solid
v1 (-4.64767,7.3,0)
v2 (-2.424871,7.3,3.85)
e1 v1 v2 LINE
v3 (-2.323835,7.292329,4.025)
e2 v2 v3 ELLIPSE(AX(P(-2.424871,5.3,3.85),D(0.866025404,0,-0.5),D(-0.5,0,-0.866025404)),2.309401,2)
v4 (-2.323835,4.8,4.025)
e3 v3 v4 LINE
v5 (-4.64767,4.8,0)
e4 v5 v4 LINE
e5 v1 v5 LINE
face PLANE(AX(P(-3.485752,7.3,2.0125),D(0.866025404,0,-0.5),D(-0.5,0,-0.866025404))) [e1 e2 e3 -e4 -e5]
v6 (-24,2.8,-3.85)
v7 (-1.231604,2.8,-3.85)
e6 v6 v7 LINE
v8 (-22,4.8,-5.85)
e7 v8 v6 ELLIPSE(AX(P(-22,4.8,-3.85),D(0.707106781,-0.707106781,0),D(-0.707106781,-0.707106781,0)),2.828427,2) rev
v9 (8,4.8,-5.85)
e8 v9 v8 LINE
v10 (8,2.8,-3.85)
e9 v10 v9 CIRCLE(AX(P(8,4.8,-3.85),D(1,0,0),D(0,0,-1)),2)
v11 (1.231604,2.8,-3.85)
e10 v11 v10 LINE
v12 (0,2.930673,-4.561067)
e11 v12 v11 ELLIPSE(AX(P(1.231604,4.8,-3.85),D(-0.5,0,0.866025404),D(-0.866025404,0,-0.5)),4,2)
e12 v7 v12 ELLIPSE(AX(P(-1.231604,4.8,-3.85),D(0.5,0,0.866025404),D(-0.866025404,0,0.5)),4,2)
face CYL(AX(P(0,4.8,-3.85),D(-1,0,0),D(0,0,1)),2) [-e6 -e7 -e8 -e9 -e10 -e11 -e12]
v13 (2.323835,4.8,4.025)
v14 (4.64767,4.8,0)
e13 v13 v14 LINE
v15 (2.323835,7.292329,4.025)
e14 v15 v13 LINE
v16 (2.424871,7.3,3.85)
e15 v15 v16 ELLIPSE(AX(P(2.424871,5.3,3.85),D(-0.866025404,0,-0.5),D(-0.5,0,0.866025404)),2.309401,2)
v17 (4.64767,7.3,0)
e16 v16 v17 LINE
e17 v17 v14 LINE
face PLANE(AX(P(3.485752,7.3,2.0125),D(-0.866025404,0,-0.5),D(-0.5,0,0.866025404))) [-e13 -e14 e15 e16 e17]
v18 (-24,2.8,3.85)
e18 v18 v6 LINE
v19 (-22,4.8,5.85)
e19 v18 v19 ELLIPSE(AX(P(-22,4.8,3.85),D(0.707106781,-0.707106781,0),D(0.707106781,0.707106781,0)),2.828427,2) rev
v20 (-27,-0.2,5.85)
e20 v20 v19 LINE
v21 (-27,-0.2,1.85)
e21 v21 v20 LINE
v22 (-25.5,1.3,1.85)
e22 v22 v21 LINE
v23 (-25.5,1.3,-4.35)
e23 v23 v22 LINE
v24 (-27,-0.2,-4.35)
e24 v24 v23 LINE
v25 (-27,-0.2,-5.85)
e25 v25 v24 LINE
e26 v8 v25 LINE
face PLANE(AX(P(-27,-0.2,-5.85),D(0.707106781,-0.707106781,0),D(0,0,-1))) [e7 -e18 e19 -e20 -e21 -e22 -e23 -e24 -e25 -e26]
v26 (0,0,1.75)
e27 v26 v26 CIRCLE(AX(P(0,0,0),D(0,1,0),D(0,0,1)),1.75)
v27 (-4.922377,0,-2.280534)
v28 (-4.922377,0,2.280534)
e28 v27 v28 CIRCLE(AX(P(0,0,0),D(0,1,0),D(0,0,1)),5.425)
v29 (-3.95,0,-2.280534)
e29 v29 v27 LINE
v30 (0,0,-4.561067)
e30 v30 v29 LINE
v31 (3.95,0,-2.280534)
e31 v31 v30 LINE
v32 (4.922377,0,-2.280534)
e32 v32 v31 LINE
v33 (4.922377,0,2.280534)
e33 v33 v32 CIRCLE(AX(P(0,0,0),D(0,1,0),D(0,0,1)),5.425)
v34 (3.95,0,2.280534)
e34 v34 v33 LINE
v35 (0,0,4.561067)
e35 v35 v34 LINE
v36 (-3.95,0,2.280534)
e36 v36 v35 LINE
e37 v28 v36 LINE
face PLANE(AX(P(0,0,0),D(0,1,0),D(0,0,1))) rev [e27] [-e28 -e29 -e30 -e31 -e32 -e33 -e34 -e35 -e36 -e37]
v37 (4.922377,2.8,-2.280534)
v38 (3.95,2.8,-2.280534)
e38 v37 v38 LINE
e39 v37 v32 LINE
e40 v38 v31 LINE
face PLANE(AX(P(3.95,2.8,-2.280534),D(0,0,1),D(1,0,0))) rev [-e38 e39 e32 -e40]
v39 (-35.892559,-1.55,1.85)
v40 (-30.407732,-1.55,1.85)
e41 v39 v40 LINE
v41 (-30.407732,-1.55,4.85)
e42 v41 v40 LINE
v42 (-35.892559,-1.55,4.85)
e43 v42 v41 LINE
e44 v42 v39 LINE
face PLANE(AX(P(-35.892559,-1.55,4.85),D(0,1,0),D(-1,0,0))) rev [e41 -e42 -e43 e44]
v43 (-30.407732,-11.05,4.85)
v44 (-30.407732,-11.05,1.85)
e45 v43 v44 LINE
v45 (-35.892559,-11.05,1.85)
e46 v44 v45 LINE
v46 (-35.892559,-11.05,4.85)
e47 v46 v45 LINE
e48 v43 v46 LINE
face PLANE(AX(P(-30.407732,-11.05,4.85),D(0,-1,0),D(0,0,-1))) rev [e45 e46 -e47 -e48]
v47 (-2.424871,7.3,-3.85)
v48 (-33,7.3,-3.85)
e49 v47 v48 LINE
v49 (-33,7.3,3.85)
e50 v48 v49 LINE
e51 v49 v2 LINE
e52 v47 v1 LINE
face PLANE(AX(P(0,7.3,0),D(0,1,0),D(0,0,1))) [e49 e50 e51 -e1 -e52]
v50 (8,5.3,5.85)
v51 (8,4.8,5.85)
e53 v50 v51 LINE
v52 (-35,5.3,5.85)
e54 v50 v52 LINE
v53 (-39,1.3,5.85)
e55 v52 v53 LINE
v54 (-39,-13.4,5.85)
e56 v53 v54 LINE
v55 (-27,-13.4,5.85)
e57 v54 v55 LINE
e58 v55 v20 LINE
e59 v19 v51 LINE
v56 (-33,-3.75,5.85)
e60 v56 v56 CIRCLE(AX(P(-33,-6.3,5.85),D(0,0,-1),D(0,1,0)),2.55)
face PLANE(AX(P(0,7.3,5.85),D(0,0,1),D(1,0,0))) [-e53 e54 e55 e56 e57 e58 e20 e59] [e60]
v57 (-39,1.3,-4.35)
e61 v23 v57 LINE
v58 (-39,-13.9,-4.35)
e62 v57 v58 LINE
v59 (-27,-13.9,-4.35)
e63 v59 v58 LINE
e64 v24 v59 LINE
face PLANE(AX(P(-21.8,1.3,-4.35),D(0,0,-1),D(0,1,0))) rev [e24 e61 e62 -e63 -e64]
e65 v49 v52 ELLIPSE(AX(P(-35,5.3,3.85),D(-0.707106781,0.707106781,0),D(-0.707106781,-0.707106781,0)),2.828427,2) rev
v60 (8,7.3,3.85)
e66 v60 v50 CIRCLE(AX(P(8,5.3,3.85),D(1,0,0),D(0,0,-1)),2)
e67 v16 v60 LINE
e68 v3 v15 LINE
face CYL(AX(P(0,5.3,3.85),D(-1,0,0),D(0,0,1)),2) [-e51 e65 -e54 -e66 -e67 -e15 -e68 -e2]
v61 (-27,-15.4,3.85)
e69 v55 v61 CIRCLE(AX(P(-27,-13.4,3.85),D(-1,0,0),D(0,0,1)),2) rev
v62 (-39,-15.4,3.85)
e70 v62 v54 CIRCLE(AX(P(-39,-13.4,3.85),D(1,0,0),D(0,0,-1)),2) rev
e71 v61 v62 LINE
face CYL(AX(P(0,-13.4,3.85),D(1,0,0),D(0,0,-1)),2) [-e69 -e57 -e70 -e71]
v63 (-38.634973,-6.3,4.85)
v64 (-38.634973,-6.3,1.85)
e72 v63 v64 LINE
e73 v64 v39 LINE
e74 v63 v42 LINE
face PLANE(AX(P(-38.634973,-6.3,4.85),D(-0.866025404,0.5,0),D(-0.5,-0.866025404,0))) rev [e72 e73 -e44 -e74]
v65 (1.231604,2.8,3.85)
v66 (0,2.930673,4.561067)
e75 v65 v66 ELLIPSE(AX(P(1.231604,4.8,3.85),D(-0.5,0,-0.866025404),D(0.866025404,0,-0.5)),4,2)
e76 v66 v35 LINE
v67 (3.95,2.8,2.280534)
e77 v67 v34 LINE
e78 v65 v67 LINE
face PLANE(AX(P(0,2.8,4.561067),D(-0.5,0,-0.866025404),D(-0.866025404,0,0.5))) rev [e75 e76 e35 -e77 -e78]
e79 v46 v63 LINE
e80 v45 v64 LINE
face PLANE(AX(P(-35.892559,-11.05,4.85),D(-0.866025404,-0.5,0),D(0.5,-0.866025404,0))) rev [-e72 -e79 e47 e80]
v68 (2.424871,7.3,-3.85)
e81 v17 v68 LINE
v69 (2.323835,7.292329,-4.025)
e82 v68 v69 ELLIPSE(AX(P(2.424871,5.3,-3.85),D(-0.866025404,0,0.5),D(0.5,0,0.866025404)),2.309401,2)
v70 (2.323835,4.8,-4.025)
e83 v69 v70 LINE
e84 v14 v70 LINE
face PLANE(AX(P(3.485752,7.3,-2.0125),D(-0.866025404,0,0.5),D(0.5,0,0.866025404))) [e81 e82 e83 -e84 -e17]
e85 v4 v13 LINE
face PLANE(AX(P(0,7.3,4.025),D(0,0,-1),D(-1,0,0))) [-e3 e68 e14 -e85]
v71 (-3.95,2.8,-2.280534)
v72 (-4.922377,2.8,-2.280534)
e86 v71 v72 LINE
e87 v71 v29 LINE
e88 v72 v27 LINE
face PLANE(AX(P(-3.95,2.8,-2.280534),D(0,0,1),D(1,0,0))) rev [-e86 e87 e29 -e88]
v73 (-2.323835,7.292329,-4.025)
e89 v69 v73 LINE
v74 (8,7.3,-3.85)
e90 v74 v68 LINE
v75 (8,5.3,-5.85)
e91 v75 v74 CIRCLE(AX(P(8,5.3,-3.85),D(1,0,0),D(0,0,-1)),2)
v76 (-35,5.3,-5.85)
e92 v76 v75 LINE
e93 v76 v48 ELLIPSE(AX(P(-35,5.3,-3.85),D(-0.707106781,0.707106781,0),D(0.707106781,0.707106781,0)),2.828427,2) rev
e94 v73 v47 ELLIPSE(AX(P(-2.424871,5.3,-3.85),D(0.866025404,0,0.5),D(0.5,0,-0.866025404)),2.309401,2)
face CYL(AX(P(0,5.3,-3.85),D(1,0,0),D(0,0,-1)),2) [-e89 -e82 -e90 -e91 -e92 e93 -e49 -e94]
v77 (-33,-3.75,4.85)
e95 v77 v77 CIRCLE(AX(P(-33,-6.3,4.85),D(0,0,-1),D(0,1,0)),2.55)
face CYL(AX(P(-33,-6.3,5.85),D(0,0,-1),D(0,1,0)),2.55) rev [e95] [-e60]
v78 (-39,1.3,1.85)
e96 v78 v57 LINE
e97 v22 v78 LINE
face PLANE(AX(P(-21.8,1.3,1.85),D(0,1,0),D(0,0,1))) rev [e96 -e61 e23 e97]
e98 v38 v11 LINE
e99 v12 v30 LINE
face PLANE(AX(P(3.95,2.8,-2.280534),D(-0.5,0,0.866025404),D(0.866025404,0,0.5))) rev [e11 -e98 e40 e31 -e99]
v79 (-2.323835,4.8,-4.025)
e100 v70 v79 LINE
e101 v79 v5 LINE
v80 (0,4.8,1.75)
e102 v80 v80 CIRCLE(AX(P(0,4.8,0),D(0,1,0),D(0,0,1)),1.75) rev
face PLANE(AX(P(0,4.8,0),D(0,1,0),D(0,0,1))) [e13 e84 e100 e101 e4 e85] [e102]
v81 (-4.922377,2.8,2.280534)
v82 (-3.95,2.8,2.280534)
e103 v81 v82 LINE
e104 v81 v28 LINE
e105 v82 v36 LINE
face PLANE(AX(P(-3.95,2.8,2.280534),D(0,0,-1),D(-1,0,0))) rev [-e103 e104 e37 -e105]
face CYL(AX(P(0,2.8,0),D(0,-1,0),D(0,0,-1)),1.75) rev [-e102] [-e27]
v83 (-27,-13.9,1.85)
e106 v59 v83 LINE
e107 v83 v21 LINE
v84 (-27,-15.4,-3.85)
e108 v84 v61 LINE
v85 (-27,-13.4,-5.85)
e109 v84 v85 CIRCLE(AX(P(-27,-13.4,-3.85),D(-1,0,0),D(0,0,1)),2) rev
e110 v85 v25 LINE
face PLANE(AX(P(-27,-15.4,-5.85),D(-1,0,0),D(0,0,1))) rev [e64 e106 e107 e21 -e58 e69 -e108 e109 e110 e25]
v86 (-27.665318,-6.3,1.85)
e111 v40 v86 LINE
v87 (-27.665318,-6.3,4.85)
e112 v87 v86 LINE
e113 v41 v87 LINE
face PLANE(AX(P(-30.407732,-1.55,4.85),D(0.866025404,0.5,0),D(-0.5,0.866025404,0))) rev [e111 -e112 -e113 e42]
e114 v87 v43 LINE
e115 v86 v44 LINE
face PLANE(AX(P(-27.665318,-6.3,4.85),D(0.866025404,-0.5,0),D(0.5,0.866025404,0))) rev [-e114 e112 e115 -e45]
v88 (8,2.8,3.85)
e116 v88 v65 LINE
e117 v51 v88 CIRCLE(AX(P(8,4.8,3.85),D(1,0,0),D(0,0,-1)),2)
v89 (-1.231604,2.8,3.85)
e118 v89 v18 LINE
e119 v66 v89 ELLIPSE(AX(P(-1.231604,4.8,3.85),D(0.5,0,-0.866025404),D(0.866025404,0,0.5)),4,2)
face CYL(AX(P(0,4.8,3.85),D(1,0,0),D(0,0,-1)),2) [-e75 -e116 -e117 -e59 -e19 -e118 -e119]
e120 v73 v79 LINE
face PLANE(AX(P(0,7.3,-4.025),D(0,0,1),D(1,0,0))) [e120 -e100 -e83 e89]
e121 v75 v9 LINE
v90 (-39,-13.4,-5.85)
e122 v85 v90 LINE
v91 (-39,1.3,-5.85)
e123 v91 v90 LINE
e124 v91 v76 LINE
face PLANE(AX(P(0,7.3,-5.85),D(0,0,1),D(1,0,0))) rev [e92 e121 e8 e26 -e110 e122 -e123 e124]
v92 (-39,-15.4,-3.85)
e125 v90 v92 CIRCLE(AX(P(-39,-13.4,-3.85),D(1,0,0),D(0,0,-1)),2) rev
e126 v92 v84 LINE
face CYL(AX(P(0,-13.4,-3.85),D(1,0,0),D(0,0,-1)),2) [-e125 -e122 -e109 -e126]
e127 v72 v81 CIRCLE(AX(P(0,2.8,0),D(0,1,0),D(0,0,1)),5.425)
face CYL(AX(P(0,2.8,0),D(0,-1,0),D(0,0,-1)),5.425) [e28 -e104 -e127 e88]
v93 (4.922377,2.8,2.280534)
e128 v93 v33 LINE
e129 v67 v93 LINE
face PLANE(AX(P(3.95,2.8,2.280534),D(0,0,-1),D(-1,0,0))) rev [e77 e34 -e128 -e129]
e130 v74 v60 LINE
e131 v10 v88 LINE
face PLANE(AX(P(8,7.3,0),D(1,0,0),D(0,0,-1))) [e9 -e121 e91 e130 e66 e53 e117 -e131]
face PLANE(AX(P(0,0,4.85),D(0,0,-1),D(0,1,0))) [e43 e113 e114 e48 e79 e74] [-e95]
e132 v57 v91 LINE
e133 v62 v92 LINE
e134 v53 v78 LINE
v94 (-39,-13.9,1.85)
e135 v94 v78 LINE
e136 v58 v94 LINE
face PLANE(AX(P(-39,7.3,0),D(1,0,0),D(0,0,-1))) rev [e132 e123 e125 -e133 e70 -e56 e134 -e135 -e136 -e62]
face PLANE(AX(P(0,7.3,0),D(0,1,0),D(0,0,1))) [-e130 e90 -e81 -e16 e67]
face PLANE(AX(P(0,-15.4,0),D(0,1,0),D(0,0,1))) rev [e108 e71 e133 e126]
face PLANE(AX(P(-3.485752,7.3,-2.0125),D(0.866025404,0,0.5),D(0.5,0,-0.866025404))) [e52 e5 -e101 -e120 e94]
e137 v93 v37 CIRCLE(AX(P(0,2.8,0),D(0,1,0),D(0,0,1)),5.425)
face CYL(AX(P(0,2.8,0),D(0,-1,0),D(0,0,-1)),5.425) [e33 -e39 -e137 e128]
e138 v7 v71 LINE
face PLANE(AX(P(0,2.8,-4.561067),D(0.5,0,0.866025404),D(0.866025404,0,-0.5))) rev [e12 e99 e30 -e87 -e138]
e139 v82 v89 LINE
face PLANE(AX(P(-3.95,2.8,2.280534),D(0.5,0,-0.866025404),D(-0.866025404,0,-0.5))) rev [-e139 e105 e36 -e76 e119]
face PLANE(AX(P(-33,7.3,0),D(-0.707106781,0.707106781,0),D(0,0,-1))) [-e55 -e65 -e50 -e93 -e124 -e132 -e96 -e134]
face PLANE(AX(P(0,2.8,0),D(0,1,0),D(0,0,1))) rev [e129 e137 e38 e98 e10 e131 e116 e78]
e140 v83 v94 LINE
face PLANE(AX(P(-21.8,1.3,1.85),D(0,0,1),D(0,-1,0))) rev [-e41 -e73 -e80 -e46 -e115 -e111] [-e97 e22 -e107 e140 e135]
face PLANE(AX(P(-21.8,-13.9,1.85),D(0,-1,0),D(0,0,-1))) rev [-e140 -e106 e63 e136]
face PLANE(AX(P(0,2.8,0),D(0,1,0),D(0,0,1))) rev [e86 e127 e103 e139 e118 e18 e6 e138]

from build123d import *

# Parameters (mm, degrees)
SKETCH1_R           = 1.75
BOSS_EXTRUDE1_DEPTH = 2.8
SKETCH2_W           = 47
SKETCH2_H           = 11.7
BOSS_EXTRUDE2_DEPTH = 4.5
SKETCH2_4_R         = 1.75
BOSS_EXTRUDE3_DEPTH = 2
SKETCH3_W           = 12
SKETCH3_H           = 11.7
BOSS_EXTRUDE4_DEPTH = 18.2
SKETCH4_W           = 6.2
SKETCH4_H           = 15.2
CUT_EXTRUDE2_DEPTH  = 17.2
SKETCH5_R           = 2.55
CUT_EXTRUDE4_DEPTH  = 3
SKETCH5_2_R         = 2.55
CUT_EXTRUDE5_DEPTH  = 43.631561079
FILLET1_R           = 2
CHAMFER1_SIZE       = 3
FILLET2_R           = 2
CHAMFER2_SIZE       = 6


with BuildPart() as part:
    # Sketch1 → Boss-Extrude1 (new body)
    with BuildSketch(Plane(origin=(0, 0, 0), x_dir=(1, 0, 0), z_dir=(0, 1, 0))):
        with BuildLine():
            Line((-3.95, 2.280533563), (-4.922376628, 2.280533563))
            ThreePointArc((-4.922376628, 2.280533563), (-5.425, 0), (-4.922376628, -2.280533563))
            Line((-4.922376628, -2.280533563), (-3.95, -2.280533563))
            Line((-3.95, -2.280533563), (0, -4.561067127))
            Line((0, -4.561067127), (3.95, -2.280533563))
            Line((3.95, -2.280533563), (4.922376628, -2.280533563))
            ThreePointArc((4.922376628, -2.280533563), (5.425, 0), (4.922376628, 2.280533563))
            Line((4.922376628, 2.280533563), (3.95, 2.280533563))
            Line((3.95, 2.280533563), (0, 4.561067127))
            Line((0, 4.561067127), (-3.95, 2.280533563))
        make_face()
        with Locations(Location((0, 0, 0), (0, 0, 270))):
            Circle(SKETCH1_R, mode=Mode.SUBTRACT)
    extrude(amount=BOSS_EXTRUDE1_DEPTH)

    # Sketch2 → Boss-Extrude2 (add)
    with BuildSketch(Plane(origin=(0, 2.8, 0), x_dir=(1, 0, 0), z_dir=(0, 1, 0))):
        with Locations((-15.5, 0)):
            Rectangle(SKETCH2_W, SKETCH2_H)
        Polygon((4.647669667, 0), (2.323834833, 4.025), (-2.323834833, 4.025), (-4.647669667, 0), (-2.323834833, -4.025), (2.323834833, -4.025), align=None, mode=Mode.SUBTRACT)
    extrude(amount=BOSS_EXTRUDE2_DEPTH)

    # Sketch2<4> → Boss-Extrude3 (add)
    # profile 1 of 5: a face of its own
    with BuildSketch(Plane(origin=(0, 2.8, 0), x_dir=(1, 0, 0), z_dir=(0, 1, 0))):
        Polygon((0.9284955, 4.025), (3.0215045, 2.81660069), (2.323834833, 4.025), align=None)
    # profile 2 of 5: a face of its own
    with BuildSketch(Plane(origin=(0, 2.8, 0), x_dir=(1, 0, 0), z_dir=(0, 1, 0))):
        Polygon((3.0215045, -2.81660069), (4.647669667, 0), (3.0215045, 2.81660069), (0.9284955, 4.025), (-0.9284955, 4.025), (-3.0215045, 2.81660069), (-4.647669667, 0), (-3.0215045, -2.81660069), (-0.9284955, -4.025), (0.9284955, -4.025), align=None)
        with Locations(Location((0, 0, 0), (0, 0, 270))):
            Circle(SKETCH2_4_R, mode=Mode.SUBTRACT)
    # profile 3 of 5: a face of its own
    with BuildSketch(Plane(origin=(0, 2.8, 0), x_dir=(1, 0, 0), z_dir=(0, 1, 0))):
        Polygon((2.323834833, -4.025), (3.0215045, -2.81660069), (0.9284955, -4.025), align=None)
    # profile 4 of 5: a face of its own
    with BuildSketch(Plane(origin=(0, 2.8, 0), x_dir=(1, 0, 0), z_dir=(0, 1, 0))):
        Polygon((-2.323834833, -4.025), (-0.9284955, -4.025), (-3.0215045, -2.81660069), align=None)
    # profile 5 of 5: a face of its own
    with BuildSketch(Plane(origin=(0, 2.8, 0), x_dir=(1, 0, 0), z_dir=(0, 1, 0))):
        Polygon((-3.0215045, 2.81660069), (-0.9284955, 4.025), (-2.323834833, 4.025), align=None)
    extrude(amount=BOSS_EXTRUDE3_DEPTH)

    # Sketch3 → Boss-Extrude4 (add)
    with BuildSketch(Plane.XZ.offset(-2.8)):
        with Locations((-33, 0)):
            Rectangle(SKETCH3_W, SKETCH3_H)
    extrude(amount=BOSS_EXTRUDE4_DEPTH)

    # Sketch4 → Cut-Extrude2 (cut)
    with BuildSketch(Plane.ZY.offset(39)):
        with Locations((-1.25, -6.3)):
            Rectangle(SKETCH4_W, SKETCH4_H)
    extrude(amount=-CUT_EXTRUDE2_DEPTH, mode=Mode.SUBTRACT)

    # Sketch5 → Cut-Extrude4 (cut)
    with BuildSketch(Plane(origin=(0, 0, 1.85), x_dir=(-1, 0, 0), z_dir=(0, 0, -1))):
        Polygon((38.634973236, -6.3), (35.892559458, -1.55), (30.4077319, -1.55), (27.665318122, -6.3), (30.4077319, -11.05), (35.892559458, -11.05), align=None)
        with Locations(Location((33, -6.3, 0), (0, 0, 90))):
            Circle(SKETCH5_R, mode=Mode.SUBTRACT)
    extrude(amount=-CUT_EXTRUDE4_DEPTH, mode=Mode.SUBTRACT)

    # Sketch5<2> → Cut-Extrude5 (cut, through all)
    with BuildSketch(Plane(origin=(0, 0, 1.85), x_dir=(-1, 0, 0), z_dir=(0, 0, -1))):
        with Locations(Location((33, -6.3, 0), (0, 0, 90))):
            Circle(SKETCH5_2_R)
    extrude(amount=-CUT_EXTRUDE5_DEPTH, mode=Mode.SUBTRACT)

    # Fillet1
    # the kernel refuses this fillet: 2 mm, written as the material it takes off along each edge
    with BuildSketch(Plane(origin=(-22, -15.4, 5.85), x_dir=(0, 1, 0), z_dir=(-1, 0, 0)), Plane(origin=(-44, -15.4, -5.85), x_dir=(0, 1, 0), z_dir=(1, 0, 0))) as fillet1_piece_1:
        with BuildLine():
            CenterArc((FILLET1_R, FILLET1_R), FILLET1_R, 180, 90)
            Line((0, FILLET1_R), (0, 0))
            Line((0, 0), (FILLET1_R, 0))
        make_face()
    extrude(amount=22, mode=Mode.SUBTRACT)
    with BuildSketch(Plane(origin=(-44, 7.3, 5.85), x_dir=(0, -1, 0), z_dir=(1, 0, 0)), Plane(origin=(13, 7.3, -5.85), x_dir=(0, -1, 0), z_dir=(-1, 0, 0))) as fillet1_piece_2:
        with BuildLine():
            CenterArc((FILLET1_R, FILLET1_R), FILLET1_R, 180, 90)
            Line((0, FILLET1_R), (0, 0))
            Line((0, 0), (FILLET1_R, 0))
        make_face()
    extrude(amount=57, mode=Mode.SUBTRACT)

    # Chamfer1
    # the kernel refuses this chamfer: 3 mm, written as the material it adds along each edge
    with BuildSketch(Plane(origin=(-27, 2.8, -5.85), x_dir=(0.9996219169112968, 0.027495876610586334, 0), z_dir=(0, 0, 1))) as chamfer1_piece_1_section:
        Polygon((CHAMFER1_SIZE * 0.999621916911, -CHAMFER1_SIZE * 0.0274958766106), (-CHAMFER1_SIZE * 0.0274958766106, -CHAMFER1_SIZE * 0.999621916911), (0, 0), align=None)
    chamfer1_piece_1 = extrude(amount=11.7, mode=Mode.PRIVATE)
    chamfer1_piece_1 = split(chamfer1_piece_1, bisect_by=Plane(origin=(-25.819796748, 1.3, -5.1), z_dir=(0, 1, 0)), keep=Keep.TOP, mode=Mode.PRIVATE)
    chamfer1_piece_1 = split(chamfer1_piece_1, bisect_by=Plane(origin=(-25.819796748, 2.175297131, -4.35), z_dir=(0, 0, -1)), keep=Keep.TOP, mode=Mode.PRIVATE)
    add(chamfer1_piece_1)
    with BuildSketch(Plane(origin=(-27, 2.8, -5.85), x_dir=(0.9996219169112968, 0.027495876610586334, 0), z_dir=(0, 0, 1))) as chamfer1_piece_2_section:
        Polygon((CHAMFER1_SIZE * 0.999621916911, -CHAMFER1_SIZE * 0.0274958766106), (-CHAMFER1_SIZE * 0.0274958766106, -CHAMFER1_SIZE * 0.999621916911), (0, 0), align=None)
    chamfer1_piece_2 = extrude(amount=11.7, mode=Mode.PRIVATE)
    chamfer1_piece_2 = split(chamfer1_piece_2, bisect_by=Plane(origin=(-26.56328803, 1.3, -5.1), z_dir=(0, -1, 0)), keep=Keep.TOP, mode=Mode.PRIVATE)
    chamfer1_piece_2 = split(chamfer1_piece_2, bisect_by=Plane(origin=(-26.56328803, 0.754421165, -4.35), z_dir=(0, 0, -1)), keep=Keep.TOP, mode=Mode.PRIVATE)
    add(chamfer1_piece_2)
    with BuildSketch(Plane(origin=(-27, 2.8, -5.85), x_dir=(0.9996219169112968, 0.027495876610586334, 0), z_dir=(0, 0, 1))) as chamfer1_piece_3_section:
        Polygon((CHAMFER1_SIZE * 0.999621916911, -CHAMFER1_SIZE * 0.0274958766106), (-CHAMFER1_SIZE * 0.0274958766106, -CHAMFER1_SIZE * 0.999621916911), (0, 0), align=None)
    chamfer1_piece_3 = extrude(amount=11.7, mode=Mode.PRIVATE)
    chamfer1_piece_3 = split(chamfer1_piece_3, bisect_by=Plane(origin=(-25.819796748, 1.3, -1.25), z_dir=(0, 1, 0)), keep=Keep.TOP, mode=Mode.PRIVATE)
    chamfer1_piece_3 = split(chamfer1_piece_3, bisect_by=Plane(origin=(-25.819796748, 2.175297131, 1.85), z_dir=(0, 0, -1)), keep=Keep.TOP, mode=Mode.PRIVATE)
    chamfer1_piece_3 = split(chamfer1_piece_3, bisect_by=Plane(origin=(-25.819796748, 2.175297131, -4.35), z_dir=(0, 0, 1)), keep=Keep.TOP, mode=Mode.PRIVATE)
    add(chamfer1_piece_3)
    with BuildSketch(Plane(origin=(-27, 2.8, -5.85), x_dir=(0.9996219169112968, 0.027495876610586334, 0), z_dir=(0, 0, 1))) as chamfer1_piece_4_section:
        Polygon((CHAMFER1_SIZE * 0.999621916911, -CHAMFER1_SIZE * 0.0274958766106), (-CHAMFER1_SIZE * 0.0274958766106, -CHAMFER1_SIZE * 0.999621916911), (0, 0), align=None)
    chamfer1_piece_4 = extrude(amount=11.7, mode=Mode.PRIVATE)
    chamfer1_piece_4 = split(chamfer1_piece_4, bisect_by=Plane(origin=(-25.819796748, 1.3, 3.85), z_dir=(0, 1, 0)), keep=Keep.TOP, mode=Mode.PRIVATE)
    chamfer1_piece_4 = split(chamfer1_piece_4, bisect_by=Plane(origin=(-25.819796748, 2.175297131, 1.85), z_dir=(0, 0, 1)), keep=Keep.TOP, mode=Mode.PRIVATE)
    add(chamfer1_piece_4)
    with BuildSketch(Plane(origin=(-27, 2.8, -5.85), x_dir=(0.9996219169112968, 0.027495876610586334, 0), z_dir=(0, 0, 1))) as chamfer1_piece_5_section:
        Polygon((CHAMFER1_SIZE * 0.999621916911, -CHAMFER1_SIZE * 0.0274958766106), (-CHAMFER1_SIZE * 0.0274958766106, -CHAMFER1_SIZE * 0.999621916911), (0, 0), align=None)
    chamfer1_piece_5 = extrude(amount=11.7, mode=Mode.PRIVATE)
    chamfer1_piece_5 = split(chamfer1_piece_5, bisect_by=Plane(origin=(-26.56328803, 1.3, 3.85), z_dir=(0, -1, 0)), keep=Keep.TOP, mode=Mode.PRIVATE)
    chamfer1_piece_5 = split(chamfer1_piece_5, bisect_by=Plane(origin=(-26.56328803, 0.754421165, 1.85), z_dir=(0, 0, 1)), keep=Keep.TOP, mode=Mode.PRIVATE)
    add(chamfer1_piece_5)

    # Fillet2
    # the kernel refuses this fillet: 2 mm, written as the material it takes off along each edge
    with BuildSketch(Plane(origin=(-29, 2.8, 5.85), x_dir=(0, 1, 0), z_dir=(1, 0, 0))) as fillet2_piece_1_section:
        with BuildLine():
            CenterArc((FILLET2_R, -FILLET2_R), FILLET2_R, 90, 90)
            Line((0, -FILLET2_R), (0, 0))
            Line((0, 0), (FILLET2_R, 0))
        make_face()
    fillet2_piece_1 = extrude(amount=42, mode=Mode.PRIVATE)
    fillet2_piece_1 = split(fillet2_piece_1, bisect_by=Plane(origin=(-18.041164539, 8.758835461, 5.380594006), z_dir=(0.7071067811868302, -0.7071067811862648, 0)), keep=Keep.TOP, mode=Mode.PRIVATE)
    fillet2_piece_1 = split(fillet2_piece_1, bisect_by=Plane(origin=(-9.744227799, 3.236820588, 10.186899669), z_dir=(-0.5, 0, -0.8660254037844387)), keep=Keep.TOP, mode=Mode.PRIVATE)
    fillet2_piece_1 = split(fillet2_piece_1, bisect_by=Plane(origin=(-9.034496702, 3.236820588, -0.655001976), z_dir=(-0.4999999999999998, 0, 0.8660254037844388)), keep=Keep.TOP, mode=Mode.PRIVATE)
    add(fillet2_piece_1, mode=Mode.SUBTRACT)
    with BuildSketch(Plane(origin=(-29, 2.8, 5.85), x_dir=(0, 1, 0), z_dir=(1, 0, 0))) as fillet2_piece_2_section:
        with BuildLine():
            CenterArc((FILLET2_R, -FILLET2_R), FILLET2_R, 90, 90)
            Line((0, -FILLET2_R), (0, 0))
            Line((0, 0), (FILLET2_R, 0))
        make_face()
    fillet2_piece_2 = extrude(amount=42, mode=Mode.PRIVATE)
    fillet2_piece_2 = split(fillet2_piece_2, bisect_by=Plane(origin=(-0.44699773, 3.373635394, 4.819141386), z_dir=(0.5, 0, 0.8660254037844387)), keep=Keep.TOP, mode=Mode.PRIVATE)
    fillet2_piece_2 = split(fillet2_piece_2, bisect_by=Plane(origin=(0.44699773, 3.373635394, 4.819141386), z_dir=(-0.4999999999999998, 0, 0.8660254037844388)), keep=Keep.TOP, mode=Mode.PRIVATE)
    add(fillet2_piece_2, mode=Mode.SUBTRACT)
    with BuildSketch(Plane(origin=(-29, 2.8, 5.85), x_dir=(0, 1, 0), z_dir=(1, 0, 0))) as fillet2_piece_3_section:
        with BuildLine():
            CenterArc((FILLET2_R, -FILLET2_R), FILLET2_R, 90, 90)
            Line((0, -FILLET2_R), (0, 0))
            Line((0, 0), (FILLET2_R, 0))
        make_face()
    fillet2_piece_3 = extrude(amount=42, mode=Mode.PRIVATE)
    fillet2_piece_3 = split(fillet2_piece_3, bisect_by=Plane(origin=(5.072316414, 3.23833996, 1.632563879), z_dir=(0.5, 0, 0.8660254037844387)), keep=Keep.TOP, mode=Mode.PRIVATE)
    fillet2_piece_3 = split(fillet2_piece_3, bisect_by=Plane(origin=(5.777120332, 3.23833996, 7.896489105), z_dir=(0.4999999999999998, 0, -0.8660254037844388)), keep=Keep.TOP, mode=Mode.PRIVATE)
    add(fillet2_piece_3, mode=Mode.SUBTRACT)
    with BuildSketch(Plane(origin=(13, 2.8, -5.85), x_dir=(0, 0, 1), z_dir=(-1, 0, 0))) as fillet2_piece_4_section:
        with BuildLine():
            CenterArc((FILLET2_R, FILLET2_R), FILLET2_R, 180, 90)
            Line((0, FILLET2_R), (0, 0))
            Line((0, 0), (FILLET2_R, 0))
        make_face()
    fillet2_piece_4 = extrude(amount=42, mode=Mode.PRIVATE)
    fillet2_piece_4 = split(fillet2_piece_4, bisect_by=Plane(origin=(5.777120334, 3.23833996, -7.896489107), z_dir=(0.49999999999999983, 0, 0.8660254037844388)), keep=Keep.TOP, mode=Mode.PRIVATE)
    fillet2_piece_4 = split(fillet2_piece_4, bisect_by=Plane(origin=(5.072316416, 3.23833996, -1.632563878), z_dir=(0.4999999999999997, 0, -0.866025403784439)), keep=Keep.TOP, mode=Mode.PRIVATE)
    add(fillet2_piece_4, mode=Mode.SUBTRACT)
    with BuildSketch(Plane(origin=(13, 2.8, -5.85), x_dir=(0, 0, 1), z_dir=(-1, 0, 0))) as fillet2_piece_5_section:
        with BuildLine():
            CenterArc((FILLET2_R, FILLET2_R), FILLET2_R, 180, 90)
            Line((0, FILLET2_R), (0, 0))
            Line((0, 0), (FILLET2_R, 0))
        make_face()
    fillet2_piece_5 = extrude(amount=42, mode=Mode.PRIVATE)
    fillet2_piece_5 = split(fillet2_piece_5, bisect_by=Plane(origin=(0.44699773, 3.373635394, -4.819141386), z_dir=(-0.49999999999999983, 0, -0.8660254037844388)), keep=Keep.TOP, mode=Mode.PRIVATE)
    fillet2_piece_5 = split(fillet2_piece_5, bisect_by=Plane(origin=(-0.44699773, 3.373635394, -4.819141386), z_dir=(0.4999999999999997, 0, -0.866025403784439)), keep=Keep.TOP, mode=Mode.PRIVATE)
    add(fillet2_piece_5, mode=Mode.SUBTRACT)
    with BuildSketch(Plane(origin=(13, 2.8, -5.85), x_dir=(0, 0, 1), z_dir=(-1, 0, 0))) as fillet2_piece_6_section:
        with BuildLine():
            CenterArc((FILLET2_R, FILLET2_R), FILLET2_R, 180, 90)
            Line((0, FILLET2_R), (0, 0))
            Line((0, 0), (FILLET2_R, 0))
        make_face()
    fillet2_piece_6 = extrude(amount=42, mode=Mode.PRIVATE)
    fillet2_piece_6 = split(fillet2_piece_6, bisect_by=Plane(origin=(-18.041164541, 8.758835459, -5.380594006), z_dir=(0.7071067811868302, -0.7071067811862648, 0)), keep=Keep.TOP, mode=Mode.PRIVATE)
    fillet2_piece_6 = split(fillet2_piece_6, bisect_by=Plane(origin=(-9.034496704, 3.236820588, 0.655001977), z_dir=(-0.49999999999999983, 0, -0.8660254037844388)), keep=Keep.TOP, mode=Mode.PRIVATE)
    fillet2_piece_6 = split(fillet2_piece_6, bisect_by=Plane(origin=(-9.744227801, 3.236820588, -10.18689967), z_dir=(-0.4999999999999997, 0, 0.866025403784439)), keep=Keep.TOP, mode=Mode.PRIVATE)
    add(fillet2_piece_6, mode=Mode.SUBTRACT)

    # Chamfer2
    # the kernel refuses this chamfer: 6 mm, written as the material it takes off along each edge
    with BuildSketch(Plane(origin=(-39, 7.3, -19.280097928), x_dir=(0.9996219169112968, 0.027495876610586334, 0), z_dir=(0, 0, 1))) as chamfer2_piece_1:
        Polygon((CHAMFER2_SIZE * 0.999621916911, -CHAMFER2_SIZE * 0.0274958766106), (-CHAMFER2_SIZE * 0.0274958766106, -CHAMFER2_SIZE * 0.999621916911), (0, 0), align=None)
    extrude(amount=38.560195856, mode=Mode.SUBTRACT)


solid = part.part
